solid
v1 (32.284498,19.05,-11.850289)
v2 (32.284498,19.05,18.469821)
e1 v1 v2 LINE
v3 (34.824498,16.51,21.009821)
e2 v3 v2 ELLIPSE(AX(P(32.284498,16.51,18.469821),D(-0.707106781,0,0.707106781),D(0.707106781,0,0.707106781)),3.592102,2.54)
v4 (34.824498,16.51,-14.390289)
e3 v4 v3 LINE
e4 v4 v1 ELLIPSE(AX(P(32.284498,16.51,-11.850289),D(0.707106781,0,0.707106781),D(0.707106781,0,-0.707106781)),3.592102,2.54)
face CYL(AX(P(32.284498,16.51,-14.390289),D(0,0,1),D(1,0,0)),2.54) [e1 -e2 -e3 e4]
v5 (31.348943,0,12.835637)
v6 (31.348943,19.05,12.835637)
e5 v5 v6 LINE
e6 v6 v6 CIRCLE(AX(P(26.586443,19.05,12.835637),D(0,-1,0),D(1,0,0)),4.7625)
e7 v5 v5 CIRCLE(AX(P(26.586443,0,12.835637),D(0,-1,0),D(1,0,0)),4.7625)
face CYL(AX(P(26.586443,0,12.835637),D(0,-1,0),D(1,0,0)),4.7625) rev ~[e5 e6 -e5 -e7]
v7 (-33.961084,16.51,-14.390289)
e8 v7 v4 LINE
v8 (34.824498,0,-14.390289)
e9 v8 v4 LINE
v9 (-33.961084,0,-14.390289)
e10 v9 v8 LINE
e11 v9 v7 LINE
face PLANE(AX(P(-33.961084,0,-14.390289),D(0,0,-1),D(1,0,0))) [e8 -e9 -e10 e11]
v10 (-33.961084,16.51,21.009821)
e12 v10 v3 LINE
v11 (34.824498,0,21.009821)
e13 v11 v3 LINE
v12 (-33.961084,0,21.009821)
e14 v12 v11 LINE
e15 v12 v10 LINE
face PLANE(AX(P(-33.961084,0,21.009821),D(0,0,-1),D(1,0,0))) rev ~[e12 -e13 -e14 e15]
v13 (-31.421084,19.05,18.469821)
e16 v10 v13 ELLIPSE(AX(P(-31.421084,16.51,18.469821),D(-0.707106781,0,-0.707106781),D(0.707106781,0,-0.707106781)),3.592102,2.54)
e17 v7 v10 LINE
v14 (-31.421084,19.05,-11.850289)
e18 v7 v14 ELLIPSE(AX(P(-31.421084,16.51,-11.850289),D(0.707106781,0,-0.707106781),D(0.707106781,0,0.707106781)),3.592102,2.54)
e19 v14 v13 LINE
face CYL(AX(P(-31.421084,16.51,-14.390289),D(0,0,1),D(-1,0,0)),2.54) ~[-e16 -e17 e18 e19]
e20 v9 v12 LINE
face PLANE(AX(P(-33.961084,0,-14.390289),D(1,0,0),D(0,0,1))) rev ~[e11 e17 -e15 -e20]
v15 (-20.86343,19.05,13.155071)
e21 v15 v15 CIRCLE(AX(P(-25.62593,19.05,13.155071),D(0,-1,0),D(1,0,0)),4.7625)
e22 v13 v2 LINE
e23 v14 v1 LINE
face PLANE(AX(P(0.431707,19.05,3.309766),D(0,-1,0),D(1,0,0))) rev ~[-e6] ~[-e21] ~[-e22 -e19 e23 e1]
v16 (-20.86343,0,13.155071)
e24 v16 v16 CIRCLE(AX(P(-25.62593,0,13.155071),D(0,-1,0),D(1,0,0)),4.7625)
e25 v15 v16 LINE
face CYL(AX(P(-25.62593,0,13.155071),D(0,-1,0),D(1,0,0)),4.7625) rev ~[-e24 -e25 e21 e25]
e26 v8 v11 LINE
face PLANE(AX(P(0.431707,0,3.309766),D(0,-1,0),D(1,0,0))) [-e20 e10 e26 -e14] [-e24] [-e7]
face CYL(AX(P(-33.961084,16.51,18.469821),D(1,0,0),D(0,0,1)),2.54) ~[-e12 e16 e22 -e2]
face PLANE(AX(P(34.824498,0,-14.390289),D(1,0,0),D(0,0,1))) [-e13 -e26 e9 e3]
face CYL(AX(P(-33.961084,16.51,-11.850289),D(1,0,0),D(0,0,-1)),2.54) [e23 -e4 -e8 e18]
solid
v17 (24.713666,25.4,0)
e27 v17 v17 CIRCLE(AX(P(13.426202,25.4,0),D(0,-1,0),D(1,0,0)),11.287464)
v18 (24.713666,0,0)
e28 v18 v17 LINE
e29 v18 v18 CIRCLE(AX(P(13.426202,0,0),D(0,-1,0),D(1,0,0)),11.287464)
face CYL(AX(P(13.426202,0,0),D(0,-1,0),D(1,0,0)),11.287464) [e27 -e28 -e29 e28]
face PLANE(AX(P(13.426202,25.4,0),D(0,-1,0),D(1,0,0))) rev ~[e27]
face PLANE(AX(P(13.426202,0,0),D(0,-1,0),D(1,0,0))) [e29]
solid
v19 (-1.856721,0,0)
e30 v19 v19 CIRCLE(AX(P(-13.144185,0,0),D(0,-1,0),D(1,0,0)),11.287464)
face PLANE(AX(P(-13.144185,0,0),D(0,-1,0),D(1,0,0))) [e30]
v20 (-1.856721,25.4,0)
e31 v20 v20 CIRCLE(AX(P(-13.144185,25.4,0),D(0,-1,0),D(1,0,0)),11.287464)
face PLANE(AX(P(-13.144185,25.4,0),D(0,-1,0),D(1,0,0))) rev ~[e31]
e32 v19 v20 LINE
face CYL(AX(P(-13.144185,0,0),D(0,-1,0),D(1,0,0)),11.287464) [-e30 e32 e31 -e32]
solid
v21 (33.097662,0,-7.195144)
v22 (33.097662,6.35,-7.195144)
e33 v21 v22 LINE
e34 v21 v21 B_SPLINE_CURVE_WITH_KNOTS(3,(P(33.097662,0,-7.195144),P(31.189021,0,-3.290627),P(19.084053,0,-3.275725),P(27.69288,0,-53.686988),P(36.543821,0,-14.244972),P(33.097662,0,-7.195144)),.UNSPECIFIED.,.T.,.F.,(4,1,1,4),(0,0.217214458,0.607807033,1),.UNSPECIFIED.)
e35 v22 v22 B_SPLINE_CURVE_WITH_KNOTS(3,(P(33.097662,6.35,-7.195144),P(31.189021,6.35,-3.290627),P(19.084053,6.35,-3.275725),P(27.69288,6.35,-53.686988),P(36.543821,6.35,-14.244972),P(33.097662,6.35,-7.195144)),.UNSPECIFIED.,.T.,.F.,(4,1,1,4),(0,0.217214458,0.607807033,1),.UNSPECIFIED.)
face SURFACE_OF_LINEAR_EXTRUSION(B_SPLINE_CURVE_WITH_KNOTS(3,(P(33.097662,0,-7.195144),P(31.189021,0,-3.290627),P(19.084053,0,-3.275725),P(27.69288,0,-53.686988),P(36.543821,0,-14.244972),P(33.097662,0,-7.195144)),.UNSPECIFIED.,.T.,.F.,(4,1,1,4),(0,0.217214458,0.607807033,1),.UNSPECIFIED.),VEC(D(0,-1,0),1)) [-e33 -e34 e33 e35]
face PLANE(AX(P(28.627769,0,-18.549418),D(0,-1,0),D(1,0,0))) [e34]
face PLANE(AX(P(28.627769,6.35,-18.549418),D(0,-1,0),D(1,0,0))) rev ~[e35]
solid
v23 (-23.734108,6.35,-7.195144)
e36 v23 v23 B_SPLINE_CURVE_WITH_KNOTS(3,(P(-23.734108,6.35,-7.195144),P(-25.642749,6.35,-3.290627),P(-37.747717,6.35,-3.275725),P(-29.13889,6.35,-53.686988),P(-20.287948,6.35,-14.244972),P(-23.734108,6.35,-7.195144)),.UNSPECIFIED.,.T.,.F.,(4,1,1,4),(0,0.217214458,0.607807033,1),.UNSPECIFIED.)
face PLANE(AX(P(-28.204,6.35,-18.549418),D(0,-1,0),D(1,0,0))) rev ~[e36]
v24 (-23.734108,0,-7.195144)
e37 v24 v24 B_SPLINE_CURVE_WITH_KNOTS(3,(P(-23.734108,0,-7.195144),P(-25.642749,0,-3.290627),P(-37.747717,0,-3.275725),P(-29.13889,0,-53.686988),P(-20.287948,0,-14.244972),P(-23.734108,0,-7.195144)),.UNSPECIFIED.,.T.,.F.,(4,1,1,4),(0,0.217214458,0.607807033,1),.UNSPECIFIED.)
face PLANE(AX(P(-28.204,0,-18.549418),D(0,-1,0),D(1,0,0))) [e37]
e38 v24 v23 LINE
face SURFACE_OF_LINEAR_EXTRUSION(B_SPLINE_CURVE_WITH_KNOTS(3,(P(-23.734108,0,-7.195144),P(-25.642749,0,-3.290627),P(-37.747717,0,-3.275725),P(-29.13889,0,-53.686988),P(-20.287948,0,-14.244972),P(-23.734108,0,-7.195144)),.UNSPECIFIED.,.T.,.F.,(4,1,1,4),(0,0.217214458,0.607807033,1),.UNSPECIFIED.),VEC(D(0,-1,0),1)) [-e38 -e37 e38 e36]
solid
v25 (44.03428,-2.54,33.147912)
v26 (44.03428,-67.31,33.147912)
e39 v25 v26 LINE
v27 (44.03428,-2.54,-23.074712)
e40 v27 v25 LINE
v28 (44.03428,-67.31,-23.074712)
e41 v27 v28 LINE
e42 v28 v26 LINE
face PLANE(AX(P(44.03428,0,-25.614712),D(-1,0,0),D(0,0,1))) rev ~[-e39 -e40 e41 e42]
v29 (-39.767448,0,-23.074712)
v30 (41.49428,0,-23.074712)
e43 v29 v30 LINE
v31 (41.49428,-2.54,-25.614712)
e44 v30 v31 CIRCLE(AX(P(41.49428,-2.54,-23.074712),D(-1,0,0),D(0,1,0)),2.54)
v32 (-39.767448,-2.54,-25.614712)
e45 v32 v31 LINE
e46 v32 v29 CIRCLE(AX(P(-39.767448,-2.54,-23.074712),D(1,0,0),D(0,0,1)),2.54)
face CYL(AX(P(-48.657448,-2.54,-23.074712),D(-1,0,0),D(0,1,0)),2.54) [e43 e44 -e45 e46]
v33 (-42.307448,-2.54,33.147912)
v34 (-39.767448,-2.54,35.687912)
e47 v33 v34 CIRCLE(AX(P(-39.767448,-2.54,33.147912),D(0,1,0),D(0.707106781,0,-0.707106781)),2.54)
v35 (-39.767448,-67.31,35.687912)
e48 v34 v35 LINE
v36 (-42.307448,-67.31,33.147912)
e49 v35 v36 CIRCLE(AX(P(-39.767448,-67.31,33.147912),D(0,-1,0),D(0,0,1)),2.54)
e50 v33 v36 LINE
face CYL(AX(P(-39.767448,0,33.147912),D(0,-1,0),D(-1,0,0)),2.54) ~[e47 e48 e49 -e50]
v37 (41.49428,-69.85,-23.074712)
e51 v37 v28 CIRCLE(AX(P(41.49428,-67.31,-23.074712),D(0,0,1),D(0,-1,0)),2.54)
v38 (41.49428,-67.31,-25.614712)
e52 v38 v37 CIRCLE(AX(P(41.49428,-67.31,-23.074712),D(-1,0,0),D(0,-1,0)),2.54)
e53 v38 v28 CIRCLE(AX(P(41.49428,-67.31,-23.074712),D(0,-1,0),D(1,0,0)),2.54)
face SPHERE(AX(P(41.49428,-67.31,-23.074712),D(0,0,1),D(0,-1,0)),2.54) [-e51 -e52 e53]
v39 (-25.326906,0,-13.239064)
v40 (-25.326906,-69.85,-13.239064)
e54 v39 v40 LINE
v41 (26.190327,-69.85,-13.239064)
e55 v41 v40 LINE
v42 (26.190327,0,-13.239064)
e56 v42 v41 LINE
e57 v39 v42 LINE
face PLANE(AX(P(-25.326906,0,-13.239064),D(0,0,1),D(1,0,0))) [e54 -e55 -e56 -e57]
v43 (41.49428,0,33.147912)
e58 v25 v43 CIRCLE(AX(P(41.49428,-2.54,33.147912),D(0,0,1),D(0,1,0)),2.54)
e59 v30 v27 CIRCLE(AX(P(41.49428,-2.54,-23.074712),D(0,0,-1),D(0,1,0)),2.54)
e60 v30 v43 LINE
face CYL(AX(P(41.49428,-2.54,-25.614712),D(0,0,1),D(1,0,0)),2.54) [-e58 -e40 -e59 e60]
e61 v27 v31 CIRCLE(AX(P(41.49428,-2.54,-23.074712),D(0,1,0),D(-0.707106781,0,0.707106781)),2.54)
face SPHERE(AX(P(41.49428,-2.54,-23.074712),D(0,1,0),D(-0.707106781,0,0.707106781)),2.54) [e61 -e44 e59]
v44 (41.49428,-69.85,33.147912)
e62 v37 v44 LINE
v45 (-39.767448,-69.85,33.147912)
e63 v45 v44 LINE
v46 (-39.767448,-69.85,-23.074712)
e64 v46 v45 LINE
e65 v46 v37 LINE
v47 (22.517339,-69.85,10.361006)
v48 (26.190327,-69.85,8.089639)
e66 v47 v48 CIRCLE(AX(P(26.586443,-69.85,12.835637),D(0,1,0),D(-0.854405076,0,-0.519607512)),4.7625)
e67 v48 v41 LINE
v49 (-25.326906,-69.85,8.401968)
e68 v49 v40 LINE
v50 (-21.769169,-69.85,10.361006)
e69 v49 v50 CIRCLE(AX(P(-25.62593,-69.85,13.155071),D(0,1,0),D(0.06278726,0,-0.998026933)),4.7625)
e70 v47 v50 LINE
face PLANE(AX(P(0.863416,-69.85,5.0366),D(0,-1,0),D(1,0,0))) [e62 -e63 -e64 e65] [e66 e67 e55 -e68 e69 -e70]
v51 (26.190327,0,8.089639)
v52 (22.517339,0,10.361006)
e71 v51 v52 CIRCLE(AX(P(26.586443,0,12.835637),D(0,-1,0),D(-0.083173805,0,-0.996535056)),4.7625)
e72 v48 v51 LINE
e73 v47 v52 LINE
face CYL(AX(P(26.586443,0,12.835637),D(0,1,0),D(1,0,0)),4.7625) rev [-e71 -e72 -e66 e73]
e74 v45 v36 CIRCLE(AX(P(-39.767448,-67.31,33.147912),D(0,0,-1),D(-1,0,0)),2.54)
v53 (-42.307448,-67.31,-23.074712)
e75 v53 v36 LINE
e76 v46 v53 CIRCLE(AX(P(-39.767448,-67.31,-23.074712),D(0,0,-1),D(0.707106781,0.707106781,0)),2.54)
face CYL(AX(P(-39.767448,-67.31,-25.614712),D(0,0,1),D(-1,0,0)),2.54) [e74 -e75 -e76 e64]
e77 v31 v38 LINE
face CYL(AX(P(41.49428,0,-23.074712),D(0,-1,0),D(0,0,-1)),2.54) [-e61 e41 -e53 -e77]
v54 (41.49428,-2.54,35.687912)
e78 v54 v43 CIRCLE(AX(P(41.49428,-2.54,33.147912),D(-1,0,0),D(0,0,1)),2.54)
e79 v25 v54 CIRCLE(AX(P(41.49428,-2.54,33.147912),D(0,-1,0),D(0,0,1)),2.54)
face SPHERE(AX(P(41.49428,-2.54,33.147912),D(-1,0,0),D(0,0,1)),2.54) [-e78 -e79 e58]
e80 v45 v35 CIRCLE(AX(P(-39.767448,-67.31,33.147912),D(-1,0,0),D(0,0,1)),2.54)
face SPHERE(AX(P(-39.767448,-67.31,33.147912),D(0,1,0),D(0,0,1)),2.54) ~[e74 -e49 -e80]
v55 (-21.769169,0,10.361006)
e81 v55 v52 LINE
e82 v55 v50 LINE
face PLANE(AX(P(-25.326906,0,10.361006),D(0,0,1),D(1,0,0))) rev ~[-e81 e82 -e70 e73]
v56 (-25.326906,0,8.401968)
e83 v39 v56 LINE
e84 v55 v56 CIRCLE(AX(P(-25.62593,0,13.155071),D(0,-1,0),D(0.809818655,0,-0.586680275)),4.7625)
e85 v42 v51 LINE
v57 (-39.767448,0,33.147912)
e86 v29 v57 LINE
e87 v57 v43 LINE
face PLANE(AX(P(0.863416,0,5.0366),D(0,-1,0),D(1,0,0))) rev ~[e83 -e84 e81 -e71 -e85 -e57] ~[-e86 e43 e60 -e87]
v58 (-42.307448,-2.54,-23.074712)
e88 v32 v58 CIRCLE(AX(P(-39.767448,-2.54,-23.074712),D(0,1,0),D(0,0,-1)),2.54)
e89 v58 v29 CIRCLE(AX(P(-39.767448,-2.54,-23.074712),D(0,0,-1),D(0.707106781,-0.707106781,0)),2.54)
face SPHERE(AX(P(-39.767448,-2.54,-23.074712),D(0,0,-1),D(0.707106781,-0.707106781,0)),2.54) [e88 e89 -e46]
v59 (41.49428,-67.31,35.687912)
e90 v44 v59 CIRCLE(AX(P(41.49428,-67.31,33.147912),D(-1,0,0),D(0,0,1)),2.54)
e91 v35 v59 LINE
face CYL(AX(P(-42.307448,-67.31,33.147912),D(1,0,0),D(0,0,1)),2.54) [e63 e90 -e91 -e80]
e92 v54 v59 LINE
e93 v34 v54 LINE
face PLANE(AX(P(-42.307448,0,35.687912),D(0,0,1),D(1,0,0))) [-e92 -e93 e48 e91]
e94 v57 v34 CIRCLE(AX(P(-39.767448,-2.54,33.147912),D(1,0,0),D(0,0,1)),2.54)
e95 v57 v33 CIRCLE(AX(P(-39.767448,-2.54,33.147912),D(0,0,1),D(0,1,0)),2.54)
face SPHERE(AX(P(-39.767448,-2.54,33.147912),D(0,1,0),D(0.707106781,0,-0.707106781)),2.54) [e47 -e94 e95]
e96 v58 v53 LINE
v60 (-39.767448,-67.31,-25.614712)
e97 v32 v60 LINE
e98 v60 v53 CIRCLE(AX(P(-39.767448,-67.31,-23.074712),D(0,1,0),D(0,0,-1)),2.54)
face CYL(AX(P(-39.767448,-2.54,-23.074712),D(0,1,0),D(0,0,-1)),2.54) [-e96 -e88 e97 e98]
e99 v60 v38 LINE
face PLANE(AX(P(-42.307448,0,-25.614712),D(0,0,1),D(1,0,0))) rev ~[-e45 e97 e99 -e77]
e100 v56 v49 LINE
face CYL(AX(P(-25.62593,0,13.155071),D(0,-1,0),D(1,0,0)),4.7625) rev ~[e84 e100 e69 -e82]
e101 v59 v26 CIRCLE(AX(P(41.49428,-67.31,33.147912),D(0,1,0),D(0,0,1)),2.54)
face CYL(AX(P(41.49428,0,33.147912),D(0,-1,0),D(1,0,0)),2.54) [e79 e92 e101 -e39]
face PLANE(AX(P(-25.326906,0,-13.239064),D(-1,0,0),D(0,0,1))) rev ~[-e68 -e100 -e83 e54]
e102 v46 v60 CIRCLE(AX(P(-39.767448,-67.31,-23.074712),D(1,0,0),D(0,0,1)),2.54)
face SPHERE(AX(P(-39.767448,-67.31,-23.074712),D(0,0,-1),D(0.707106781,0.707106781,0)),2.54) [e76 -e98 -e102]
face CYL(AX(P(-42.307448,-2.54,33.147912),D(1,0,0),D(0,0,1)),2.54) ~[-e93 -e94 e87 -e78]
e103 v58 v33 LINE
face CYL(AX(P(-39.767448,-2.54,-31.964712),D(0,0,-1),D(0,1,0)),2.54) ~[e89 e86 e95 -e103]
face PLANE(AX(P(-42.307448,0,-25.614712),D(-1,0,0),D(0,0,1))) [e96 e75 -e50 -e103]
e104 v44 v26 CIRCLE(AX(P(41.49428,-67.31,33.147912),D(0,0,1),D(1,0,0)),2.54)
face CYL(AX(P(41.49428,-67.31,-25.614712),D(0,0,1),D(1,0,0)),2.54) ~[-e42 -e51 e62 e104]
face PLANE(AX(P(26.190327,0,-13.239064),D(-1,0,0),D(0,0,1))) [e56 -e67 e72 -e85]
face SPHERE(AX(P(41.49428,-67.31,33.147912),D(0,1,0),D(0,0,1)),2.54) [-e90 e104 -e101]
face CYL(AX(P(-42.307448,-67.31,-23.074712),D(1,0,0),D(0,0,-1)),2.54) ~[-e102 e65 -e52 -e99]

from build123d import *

# Parameters (mm, degrees)
F1_W          = 86.341727525
F1_H          = 61.3026246428
F2_DEPTH      = 69.85
F0_R          = 11.2874637249
F5_DEPTH      = 25.4
F6_DEPTH      = 6.35
F3_W          = 68.7855817378
F3_H          = 35.4001102969
F7_DEPTH      = 19.05
F8_R          = 2.54
F8_2_R        = 2.54
F9_T1_DEPTH   = 65.1126246428
F9_T3_DEPTH   = 90.151727525
F9_S7_W       = 2.54
F9_S7_H       = 2.54
F9_T8_DEPTH   = 2.54
F9_S13_W      = 2.54
F9_S13_H      = 2.54
F9_T14_DEPTH  = 2.54
F10_T1_DEPTH  = 64.77
F10_S5_W      = 2.54
F10_S5_H      = 2.54
F10_T6_DEPTH  = 2.54
F10_S11_W     = 2.54
F10_S11_H     = 2.54
F10_T12_DEPTH = 2.54
F11_R         = 4.7625
F12_DEPTH     = 279.4
F13_W         = 51.5172332525
F13_H         = 23.6000707373
F14_DEPTH     = 101.6


# Not quite as in the source:
# - a fillet or chamfer that OpenCascade refuses, or shapes differently, is made with other operations: its cross-section is extruded or revolved along the edge and cut away or added


with BuildPart() as f2:
    # F1 (on Front) → F2 (new body)
    with BuildSketch(Plane.XZ):
        with Locations((0.8634161204, 5.0365999341)):
            Rectangle(F1_W, F1_H)
    extrude(amount=F2_DEPTH)

    # F8
    f8_edges = [f2.edges().sort_by_distance(p)[0] for p in [
        (-42.307448, -34.925, 35.687912),
        (0.863416, 0, 35.687912),
        (44.03428, -34.925, 35.687912),
        (0.863416, -69.85, 35.687912),
        (44.03428, -69.85, 5.0366),
        (-42.307448, -69.85, 5.0366),
        (0.863416, -69.85, -25.614712),
        (44.03428, -34.925, -25.614712),
        (44.03428, 0, 5.0366),
    ]]
    fillet(f8_edges, radius=F8_R)

    # F9: fillet of radius 2.54 on 2 edges, made by hand

    # F9_s2 → F9_t1 (cut)
    with BuildSketch(Plane.XY.offset(-31.9647123873)):
        with BuildLine():
            ThreePointArc((-39.7674476421, 0), (-41.5634988663, -0.7439487758), (-42.3074476421, -2.54))
            Line((-42.3074476421, -2.54), (-42.3074476421, 0))
            Line((-42.3074476421, 0), (-39.7674476421, 0))
        make_face()
    extrude(amount=F9_T1_DEPTH, mode=Mode.SUBTRACT)

    # F9_s4 → F9_t3 (cut)
    with BuildSketch(Plane.YZ.offset(-48.6574476421)):
        with BuildLine():
            ThreePointArc((0, -23.0747123873), (-0.7439487758, -24.8707636115), (-2.54, -25.6147123873))
            Line((-2.54, -25.6147123873), (0, -25.6147123873))
            Line((0, -25.6147123873), (0, -23.0747123873))
        make_face()
    extrude(amount=F9_T3_DEPTH, mode=Mode.SUBTRACT)


with BuildPart() as f5:
    # F0 (on Front) → F5 (new body)
    with BuildSketch(Plane.XZ):
        with Locations((-13.1441846499, 0)):
            Circle(F0_R)
    extrude(amount=-F5_DEPTH)


with BuildPart() as f5b:
    # F0 (on Front) → F5, piece 2 (new body)
    with BuildSketch(Plane.XZ):
        with Locations((13.4262019347, 0)):
            Circle(F0_R)
    extrude(amount=-F5_DEPTH)


with BuildPart() as f6:
    # F4 (on Front) → F6 (new body)
    with BuildSketch(Plane.XZ):
        with BuildLine():
            add(Edge.make_bspline(
                [(33.0976620317, -7.1951444261), (31.1890209887, -3.2906266132), (19.0840525939, -3.2757250199), (27.6928798629, -53.6869881743), (36.5438211862, -14.2449717651), (33.0976620317, -7.1951444261)],
                knots=[0, 0, 0, 0, 0.2172144581, 0.6078070332, 1, 1, 1, 1], degree=3))
        make_face()
    extrude(amount=-F6_DEPTH)


with BuildPart() as f6b:
    # F4 (on Front) → F6, piece 2 (new body)
    with BuildSketch(Plane.XZ):
        with BuildLine():
            add(Edge.make_bspline(
                [(-23.7341076136, -7.1951444261), (-25.6427486565, -3.2906266132), (-37.7477170514, -3.2757250199), (-29.1388897823, -53.6869881743), (-20.287948459, -14.2449717651), (-23.7341076136, -7.1951444261)],
                knots=[0, 0, 0, 0, 0.2172144581, 0.6078070332, 1, 1, 1, 1], degree=3))
        make_face()
    extrude(amount=-F6_DEPTH)


with BuildPart() as f7:
    # F3 (on Front) → F7 (new body)
    with BuildSketch(Plane.XZ):
        with Locations((0.4317071289, 3.3097662963)):
            Rectangle(F3_W, F3_H)
    extrude(amount=-F7_DEPTH)

    # F8#2
    f8_2_edges = [f7.edges().sort_by_distance(p)[0] for p in [
        (0.431707, 19.05, 21.009821),
        (-33.961084, 19.05, 3.309766),
        (0.431707, 19.05, -14.390289),
        (34.824498, 19.05, 3.309766),
    ]]
    fillet(f8_2_edges, radius=F8_2_R)


with BuildPart() as f9_tool6:
    # F9_s7 → F9_t8 (new body)
    with BuildSketch(Plane.XZ.offset(2.54)):
        with Locations((42.7642798829, -24.3447123873)):
            Rectangle(F9_S7_W, F9_S7_H)
    extrude(amount=-F9_T8_DEPTH)

    # F9_s9 → F9_t10 (revolve, cut)
    with BuildSketch(Plane(origin=(41.4942798829, -2.54, -23.0747123873), x_dir=(-0.7071067812, 0, 0.7071067812), z_dir=(-0.7071067812, 0, -0.7071067812))):
        with BuildLine():
            ThreePointArc((0, -2.54), (2.54, 0), (0, 2.54))
            Line((0, 2.54), (0, -2.54))
        make_face()
    revolve(axis=Axis((41.4942798829, -2.54, -23.0747123873), (0, 1, 0)), mode=Mode.SUBTRACT)


with BuildPart() as f2_1:
    add(f2.part)

    # F9_t5: cut F9_tool6
    add(f9_tool6.part, mode=Mode.SUBTRACT)


with BuildPart() as f9_tool12:
    # F9_s13 → F9_t14 (new body)
    with BuildSketch(Plane.XZ.offset(2.54)):
        with Locations((-41.0374476421, 34.4179122555)):
            Rectangle(F9_S13_W, F9_S13_H)
    extrude(amount=-F9_T14_DEPTH)

    # F9_s15 → F9_t16 (revolve, cut)
    with BuildSketch(Plane(origin=(-39.7674476421, -2.54, 33.1479122555), x_dir=(0.7071067812, 0, -0.7071067812), z_dir=(0.7071067812, 0, 0.7071067812))):
        with BuildLine():
            ThreePointArc((0, -2.54), (2.54, 0), (0, 2.54))
            Line((0, 2.54), (0, -2.54))
        make_face()
    revolve(axis=Axis((-39.7674476421, -2.54, 33.1479122555), (0, 1, 0)), mode=Mode.SUBTRACT)


with BuildPart() as f2_2:
    add(f2_1.part)

    # F9_t11: cut F9_tool12
    add(f9_tool12.part, mode=Mode.SUBTRACT)

    # F10: fillet of radius 2.54 on 1 edges, made by hand

    # F10_s2 → F10_t1 (cut)
    with BuildSketch(Plane.XZ.offset(2.54)):
        with BuildLine():
            ThreePointArc((-39.7674476421, -25.6147123873), (-41.5634988663, -24.8707636115), (-42.3074476421, -23.0747123873))
            Line((-42.3074476421, -23.0747123873), (-42.3074476421, -25.6147123873))
            Line((-42.3074476421, -25.6147123873), (-39.7674476421, -25.6147123873))
        make_face()
    extrude(amount=F10_T1_DEPTH, mode=Mode.SUBTRACT)


with BuildPart() as f10_tool4:
    # F10_s5 → F10_t6 (new body)
    with BuildSketch(Plane.XY.offset(-23.0747123873)):
        with Locations((-41.0374476421, -1.27)):
            Rectangle(F10_S5_W, F10_S5_H)
    extrude(amount=-F10_T6_DEPTH)

    # F10_s7 → F10_t8 (revolve, cut)
    with BuildSketch(Plane(origin=(-39.7674476421, -2.54, -23.0747123873), x_dir=(0.7071067812, -0.7071067812, 0), z_dir=(0.7071067812, 0.7071067812, 0))):
        with BuildLine():
            ThreePointArc((0, -2.54), (2.54, 0), (0, 2.54))
            Line((0, 2.54), (0, -2.54))
        make_face()
    revolve(axis=Axis((-39.7674476421, -2.54, -23.0747123873), (0, 0, -1)), mode=Mode.SUBTRACT)


with BuildPart() as f2_3:
    add(f2_2.part)

    # F10_t3: cut F10_tool4
    add(f10_tool4.part, mode=Mode.SUBTRACT)


with BuildPart() as f10_tool10:
    # F10_s11 → F10_t12 (new body)
    with BuildSketch(Plane.XY.offset(-23.0747123873)):
        with Locations((-41.0374476421, -68.58)):
            Rectangle(F10_S11_W, F10_S11_H)
    extrude(amount=-F10_T12_DEPTH)

    # F10_s13 → F10_t14 (revolve, cut)
    with BuildSketch(Plane(origin=(-39.7674476421, -67.31, -23.0747123873), x_dir=(0.7071067812, 0.7071067812, 0), z_dir=(-0.7071067812, 0.7071067812, 0))):
        with BuildLine():
            ThreePointArc((0, -2.54), (2.54, 0), (0, 2.54))
            Line((0, 2.54), (0, -2.54))
        make_face()
    revolve(axis=Axis((-39.7674476421, -67.31, -23.0747123873), (0, 0, -1)), mode=Mode.SUBTRACT)


with BuildPart() as f2_4:
    add(f2_3.part)

    # F10_t9: cut F10_tool10
    add(f10_tool10.part, mode=Mode.SUBTRACT)


with BuildPart() as f12_tool:
    # F11 (on Front) → F12 (new body, symmetric)
    with BuildSketch(Plane.XZ):
        with Locations((26.5864427257, 12.8356372612)):
            Circle(F11_R)
        with Locations((-25.6259300993, 13.1550712943)):
            Circle(F11_R)
    extrude(amount=F12_DEPTH, both=True)


with BuildPart() as f2_5:
    add(f2_4.part)

    # F12: cut by f12_tool
    add(f12_tool.part, mode=Mode.SUBTRACT)

    # F13 (on Front) → F14 (cut)
    with BuildSketch(Plane.XZ):
        with Locations((0.4317108542, -1.4390288852)):
            Rectangle(F13_W, F13_H)
    extrude(amount=F14_DEPTH, mode=Mode.SUBTRACT)


with BuildPart() as f7_1:
    add(f7.part)

    # F12: cut by f12_tool
    add(f12_tool.part, mode=Mode.SUBTRACT)


solid = Compound([f5.part, f5b.part, f6.part, f6b.part, f2_5.part, f7_1.part])
